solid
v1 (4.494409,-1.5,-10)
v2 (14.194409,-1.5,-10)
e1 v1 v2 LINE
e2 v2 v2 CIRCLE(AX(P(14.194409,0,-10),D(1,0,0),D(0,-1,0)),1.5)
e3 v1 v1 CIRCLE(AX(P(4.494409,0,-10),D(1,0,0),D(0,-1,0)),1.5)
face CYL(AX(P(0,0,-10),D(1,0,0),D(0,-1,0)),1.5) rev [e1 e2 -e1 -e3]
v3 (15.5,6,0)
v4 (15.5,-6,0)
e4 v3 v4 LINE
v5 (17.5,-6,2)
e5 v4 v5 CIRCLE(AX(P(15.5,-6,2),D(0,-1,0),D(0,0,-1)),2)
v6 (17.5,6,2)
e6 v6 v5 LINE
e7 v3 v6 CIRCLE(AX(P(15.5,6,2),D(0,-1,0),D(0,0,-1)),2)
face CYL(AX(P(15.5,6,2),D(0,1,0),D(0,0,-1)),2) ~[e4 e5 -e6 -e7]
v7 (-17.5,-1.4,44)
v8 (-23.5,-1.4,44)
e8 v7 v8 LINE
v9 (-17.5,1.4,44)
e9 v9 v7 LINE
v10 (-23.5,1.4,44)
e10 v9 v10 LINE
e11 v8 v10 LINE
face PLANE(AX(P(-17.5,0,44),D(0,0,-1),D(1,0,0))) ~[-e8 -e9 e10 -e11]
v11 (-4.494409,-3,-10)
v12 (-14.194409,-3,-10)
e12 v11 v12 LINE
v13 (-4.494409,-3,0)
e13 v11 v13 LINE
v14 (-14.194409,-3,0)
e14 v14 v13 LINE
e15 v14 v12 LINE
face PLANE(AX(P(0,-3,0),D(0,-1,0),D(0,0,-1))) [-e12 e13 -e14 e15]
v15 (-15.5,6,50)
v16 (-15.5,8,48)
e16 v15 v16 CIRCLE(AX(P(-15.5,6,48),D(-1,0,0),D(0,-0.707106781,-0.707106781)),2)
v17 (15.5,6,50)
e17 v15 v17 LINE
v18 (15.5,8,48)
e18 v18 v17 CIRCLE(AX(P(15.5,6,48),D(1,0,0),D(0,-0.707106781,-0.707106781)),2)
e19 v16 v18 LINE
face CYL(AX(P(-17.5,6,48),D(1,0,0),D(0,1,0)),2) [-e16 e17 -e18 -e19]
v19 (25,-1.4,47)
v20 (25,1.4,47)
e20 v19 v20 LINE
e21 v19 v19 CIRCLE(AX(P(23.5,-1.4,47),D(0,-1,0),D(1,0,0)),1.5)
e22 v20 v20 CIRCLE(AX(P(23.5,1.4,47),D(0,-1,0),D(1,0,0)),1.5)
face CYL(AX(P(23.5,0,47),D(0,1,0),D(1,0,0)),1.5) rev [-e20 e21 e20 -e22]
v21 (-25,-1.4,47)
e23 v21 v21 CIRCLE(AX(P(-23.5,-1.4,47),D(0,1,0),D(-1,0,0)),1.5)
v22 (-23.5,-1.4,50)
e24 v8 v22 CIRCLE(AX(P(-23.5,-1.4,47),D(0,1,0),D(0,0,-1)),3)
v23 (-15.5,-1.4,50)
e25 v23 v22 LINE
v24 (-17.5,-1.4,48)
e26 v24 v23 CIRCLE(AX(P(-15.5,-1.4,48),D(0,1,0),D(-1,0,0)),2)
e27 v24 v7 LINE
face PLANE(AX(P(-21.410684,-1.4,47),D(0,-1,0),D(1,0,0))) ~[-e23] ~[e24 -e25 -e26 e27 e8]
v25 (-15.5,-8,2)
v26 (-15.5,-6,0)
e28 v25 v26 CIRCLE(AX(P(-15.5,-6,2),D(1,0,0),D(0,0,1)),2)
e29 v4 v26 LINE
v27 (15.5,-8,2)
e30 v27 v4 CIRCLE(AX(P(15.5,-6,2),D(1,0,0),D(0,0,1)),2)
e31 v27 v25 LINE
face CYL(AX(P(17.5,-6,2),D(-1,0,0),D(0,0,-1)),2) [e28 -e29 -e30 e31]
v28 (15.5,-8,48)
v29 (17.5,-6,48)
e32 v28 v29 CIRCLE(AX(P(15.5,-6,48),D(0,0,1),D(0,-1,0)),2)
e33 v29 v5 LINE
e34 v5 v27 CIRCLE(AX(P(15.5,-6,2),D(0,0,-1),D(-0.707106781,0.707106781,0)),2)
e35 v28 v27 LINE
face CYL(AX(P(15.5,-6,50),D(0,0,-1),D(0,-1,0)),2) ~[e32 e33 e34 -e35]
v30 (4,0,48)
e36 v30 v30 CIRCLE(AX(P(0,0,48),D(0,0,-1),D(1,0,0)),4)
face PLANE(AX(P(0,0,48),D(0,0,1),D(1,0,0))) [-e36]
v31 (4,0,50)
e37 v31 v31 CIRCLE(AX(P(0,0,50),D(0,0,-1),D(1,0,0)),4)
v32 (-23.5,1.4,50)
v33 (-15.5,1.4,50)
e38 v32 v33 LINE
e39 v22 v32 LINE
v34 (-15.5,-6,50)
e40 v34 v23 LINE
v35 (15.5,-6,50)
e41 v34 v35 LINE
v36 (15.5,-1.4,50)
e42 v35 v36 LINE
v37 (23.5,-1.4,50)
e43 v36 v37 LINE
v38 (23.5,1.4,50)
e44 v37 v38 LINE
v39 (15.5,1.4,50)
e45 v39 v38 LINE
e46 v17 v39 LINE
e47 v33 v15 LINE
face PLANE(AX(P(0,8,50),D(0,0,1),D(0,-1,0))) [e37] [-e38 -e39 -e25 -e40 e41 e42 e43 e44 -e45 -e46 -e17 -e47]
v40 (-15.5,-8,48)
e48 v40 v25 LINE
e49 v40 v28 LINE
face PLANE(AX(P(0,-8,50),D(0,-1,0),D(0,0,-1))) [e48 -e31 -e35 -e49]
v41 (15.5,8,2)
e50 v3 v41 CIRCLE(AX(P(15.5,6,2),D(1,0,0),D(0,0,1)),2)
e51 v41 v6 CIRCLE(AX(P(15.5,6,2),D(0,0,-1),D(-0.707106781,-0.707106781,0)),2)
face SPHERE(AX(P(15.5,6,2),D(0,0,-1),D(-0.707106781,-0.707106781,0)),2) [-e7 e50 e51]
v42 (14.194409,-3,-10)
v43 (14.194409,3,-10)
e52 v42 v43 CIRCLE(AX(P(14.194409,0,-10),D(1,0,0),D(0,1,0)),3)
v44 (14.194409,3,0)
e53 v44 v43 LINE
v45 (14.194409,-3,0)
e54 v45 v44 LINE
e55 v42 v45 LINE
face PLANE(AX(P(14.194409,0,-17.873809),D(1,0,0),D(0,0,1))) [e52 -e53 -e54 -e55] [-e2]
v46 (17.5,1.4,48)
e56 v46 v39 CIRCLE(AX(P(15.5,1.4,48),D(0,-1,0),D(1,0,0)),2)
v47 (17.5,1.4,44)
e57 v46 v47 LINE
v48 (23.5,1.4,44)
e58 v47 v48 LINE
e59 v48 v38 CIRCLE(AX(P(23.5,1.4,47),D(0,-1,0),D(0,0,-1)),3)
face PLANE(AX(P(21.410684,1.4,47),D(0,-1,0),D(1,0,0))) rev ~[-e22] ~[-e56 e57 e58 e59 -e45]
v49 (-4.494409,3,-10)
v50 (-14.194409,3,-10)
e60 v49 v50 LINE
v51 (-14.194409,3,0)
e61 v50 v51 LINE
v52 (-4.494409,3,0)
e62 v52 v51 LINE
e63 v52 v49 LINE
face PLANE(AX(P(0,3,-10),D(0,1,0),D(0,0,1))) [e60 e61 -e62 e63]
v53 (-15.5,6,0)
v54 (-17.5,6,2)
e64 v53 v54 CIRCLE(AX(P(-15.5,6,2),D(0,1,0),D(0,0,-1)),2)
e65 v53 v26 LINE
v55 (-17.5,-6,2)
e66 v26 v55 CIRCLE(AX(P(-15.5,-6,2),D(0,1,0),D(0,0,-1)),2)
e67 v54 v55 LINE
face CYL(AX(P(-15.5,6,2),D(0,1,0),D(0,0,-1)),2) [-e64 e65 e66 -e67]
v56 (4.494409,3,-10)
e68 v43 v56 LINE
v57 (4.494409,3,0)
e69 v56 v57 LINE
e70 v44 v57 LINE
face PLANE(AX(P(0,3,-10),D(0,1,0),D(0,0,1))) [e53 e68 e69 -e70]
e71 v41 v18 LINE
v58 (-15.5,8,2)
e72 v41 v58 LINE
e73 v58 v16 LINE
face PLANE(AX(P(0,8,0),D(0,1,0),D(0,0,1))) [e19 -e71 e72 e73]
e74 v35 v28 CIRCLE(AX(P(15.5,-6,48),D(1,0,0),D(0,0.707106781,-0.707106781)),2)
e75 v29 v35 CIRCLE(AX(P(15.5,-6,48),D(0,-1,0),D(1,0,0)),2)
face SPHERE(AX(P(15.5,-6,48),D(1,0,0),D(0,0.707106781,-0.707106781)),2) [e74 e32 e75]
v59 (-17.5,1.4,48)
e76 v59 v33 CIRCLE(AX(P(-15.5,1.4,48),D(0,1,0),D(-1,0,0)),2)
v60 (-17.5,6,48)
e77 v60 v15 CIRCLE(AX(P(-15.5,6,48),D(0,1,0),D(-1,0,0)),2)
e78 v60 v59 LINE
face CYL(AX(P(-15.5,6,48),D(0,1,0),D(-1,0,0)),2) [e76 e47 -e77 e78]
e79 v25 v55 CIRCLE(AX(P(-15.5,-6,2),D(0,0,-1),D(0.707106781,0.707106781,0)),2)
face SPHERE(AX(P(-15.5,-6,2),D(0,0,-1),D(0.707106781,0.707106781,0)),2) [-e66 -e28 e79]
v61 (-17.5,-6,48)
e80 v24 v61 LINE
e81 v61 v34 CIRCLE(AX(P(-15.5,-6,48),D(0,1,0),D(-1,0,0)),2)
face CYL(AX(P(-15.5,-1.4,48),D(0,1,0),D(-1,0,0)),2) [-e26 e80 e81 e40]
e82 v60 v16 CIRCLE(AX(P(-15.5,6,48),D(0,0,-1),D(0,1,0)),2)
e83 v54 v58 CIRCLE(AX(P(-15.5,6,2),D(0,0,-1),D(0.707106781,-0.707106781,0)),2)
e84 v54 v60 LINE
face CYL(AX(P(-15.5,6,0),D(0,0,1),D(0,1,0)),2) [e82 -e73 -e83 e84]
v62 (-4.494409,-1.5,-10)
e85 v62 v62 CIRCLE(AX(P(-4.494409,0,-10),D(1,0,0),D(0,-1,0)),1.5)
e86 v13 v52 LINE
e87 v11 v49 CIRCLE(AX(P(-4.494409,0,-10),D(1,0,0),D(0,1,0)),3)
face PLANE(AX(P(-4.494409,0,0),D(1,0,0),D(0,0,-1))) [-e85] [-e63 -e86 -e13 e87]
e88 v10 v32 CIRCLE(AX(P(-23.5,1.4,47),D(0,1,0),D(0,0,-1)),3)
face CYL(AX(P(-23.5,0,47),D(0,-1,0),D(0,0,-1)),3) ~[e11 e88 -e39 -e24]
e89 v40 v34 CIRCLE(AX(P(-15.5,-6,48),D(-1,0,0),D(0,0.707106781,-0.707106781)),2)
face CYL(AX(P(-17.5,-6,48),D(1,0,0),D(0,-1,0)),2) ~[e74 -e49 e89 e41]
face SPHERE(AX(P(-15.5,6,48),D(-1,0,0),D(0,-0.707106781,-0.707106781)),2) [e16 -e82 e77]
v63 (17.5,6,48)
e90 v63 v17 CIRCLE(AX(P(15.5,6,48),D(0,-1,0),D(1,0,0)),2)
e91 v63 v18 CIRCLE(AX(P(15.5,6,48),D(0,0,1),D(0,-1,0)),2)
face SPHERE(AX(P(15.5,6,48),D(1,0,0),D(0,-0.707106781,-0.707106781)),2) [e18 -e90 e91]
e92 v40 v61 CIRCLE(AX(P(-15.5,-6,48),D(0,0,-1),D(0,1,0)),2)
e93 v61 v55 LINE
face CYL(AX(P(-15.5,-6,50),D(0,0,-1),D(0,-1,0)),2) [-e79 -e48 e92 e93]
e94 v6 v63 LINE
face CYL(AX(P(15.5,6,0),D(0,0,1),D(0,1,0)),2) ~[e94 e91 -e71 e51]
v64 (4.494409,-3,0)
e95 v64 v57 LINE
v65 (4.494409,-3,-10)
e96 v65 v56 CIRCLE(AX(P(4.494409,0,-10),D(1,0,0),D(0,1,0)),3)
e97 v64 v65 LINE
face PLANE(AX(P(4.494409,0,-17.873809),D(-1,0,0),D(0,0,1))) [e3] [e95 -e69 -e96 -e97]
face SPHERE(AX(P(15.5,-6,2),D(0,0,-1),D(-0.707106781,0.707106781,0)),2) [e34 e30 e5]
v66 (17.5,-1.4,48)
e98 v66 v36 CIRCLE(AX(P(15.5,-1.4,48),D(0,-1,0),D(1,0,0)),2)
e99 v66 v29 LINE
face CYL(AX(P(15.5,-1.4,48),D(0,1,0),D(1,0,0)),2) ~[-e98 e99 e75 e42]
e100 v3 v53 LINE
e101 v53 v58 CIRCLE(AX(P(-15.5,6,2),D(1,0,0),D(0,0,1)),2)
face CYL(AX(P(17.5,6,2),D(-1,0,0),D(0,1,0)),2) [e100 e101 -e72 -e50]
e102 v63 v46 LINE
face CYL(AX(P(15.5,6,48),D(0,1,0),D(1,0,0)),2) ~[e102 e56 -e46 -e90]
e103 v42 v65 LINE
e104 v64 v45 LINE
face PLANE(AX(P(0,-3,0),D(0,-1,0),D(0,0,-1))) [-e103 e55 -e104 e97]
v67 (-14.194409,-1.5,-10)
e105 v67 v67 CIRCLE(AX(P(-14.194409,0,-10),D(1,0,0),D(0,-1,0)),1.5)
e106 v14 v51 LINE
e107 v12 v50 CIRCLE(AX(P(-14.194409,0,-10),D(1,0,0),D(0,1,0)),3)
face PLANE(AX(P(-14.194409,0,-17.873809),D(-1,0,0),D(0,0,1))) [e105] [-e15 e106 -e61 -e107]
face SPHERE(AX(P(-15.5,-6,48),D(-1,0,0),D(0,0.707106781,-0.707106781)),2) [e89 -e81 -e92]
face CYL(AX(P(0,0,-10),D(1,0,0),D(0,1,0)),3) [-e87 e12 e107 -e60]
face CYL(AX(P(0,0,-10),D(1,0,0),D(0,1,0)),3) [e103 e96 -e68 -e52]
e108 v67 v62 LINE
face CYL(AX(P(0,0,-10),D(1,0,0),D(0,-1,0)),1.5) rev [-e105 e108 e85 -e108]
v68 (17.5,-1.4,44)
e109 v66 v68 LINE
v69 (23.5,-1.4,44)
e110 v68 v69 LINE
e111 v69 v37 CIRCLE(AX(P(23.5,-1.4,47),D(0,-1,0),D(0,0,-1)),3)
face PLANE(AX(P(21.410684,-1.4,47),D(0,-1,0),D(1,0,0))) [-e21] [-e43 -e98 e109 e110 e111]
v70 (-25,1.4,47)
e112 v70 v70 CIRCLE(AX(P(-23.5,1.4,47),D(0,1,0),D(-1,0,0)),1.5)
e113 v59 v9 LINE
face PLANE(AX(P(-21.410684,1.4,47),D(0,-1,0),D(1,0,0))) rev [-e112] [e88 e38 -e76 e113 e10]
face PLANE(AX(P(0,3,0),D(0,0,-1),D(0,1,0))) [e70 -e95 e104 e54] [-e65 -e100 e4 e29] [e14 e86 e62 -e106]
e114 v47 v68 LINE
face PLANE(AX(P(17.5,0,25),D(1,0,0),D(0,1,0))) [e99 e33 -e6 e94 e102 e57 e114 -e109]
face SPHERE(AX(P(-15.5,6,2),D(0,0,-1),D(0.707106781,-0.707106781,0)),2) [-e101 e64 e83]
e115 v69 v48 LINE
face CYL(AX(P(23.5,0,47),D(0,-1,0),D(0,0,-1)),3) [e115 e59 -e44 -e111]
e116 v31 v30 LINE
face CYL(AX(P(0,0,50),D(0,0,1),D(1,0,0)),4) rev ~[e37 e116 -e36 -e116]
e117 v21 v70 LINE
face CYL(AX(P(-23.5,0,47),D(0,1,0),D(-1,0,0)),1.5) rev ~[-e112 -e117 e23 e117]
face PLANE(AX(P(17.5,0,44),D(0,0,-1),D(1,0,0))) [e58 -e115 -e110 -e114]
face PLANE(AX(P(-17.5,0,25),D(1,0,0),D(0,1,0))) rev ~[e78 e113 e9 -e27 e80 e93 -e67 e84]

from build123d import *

# Parameters (mm, degrees)
F1_DEPTH      = 17.5
F2_W          = 6.3770967536
F2_H          = 17.8738087416
F2_W_2        = 4.4888177946
F3_DEPTH      = 12.5
F5_R          = 4
F6_DEPTH      = 2
F7_R          = 1.5
F8_DEPTH      = 1.4
F10_R         = 2
F11_T1_DEPTH  = 12
F11_T3_DEPTH  = 4.6
F11_T5_DEPTH  = 4.6
F11_S9_W      = 2
F11_S9_H      = 2
F11_T10_DEPTH = 2
F11_S15_W     = 2
F11_S15_H     = 2
F11_T16_DEPTH = 2
F11_S21_W     = 2
F11_S21_H     = 2
F11_T22_DEPTH = 2
F11_S27_W     = 2
F11_S27_H     = 2
F11_T28_DEPTH = 2
F11_S33_W     = 2
F11_S33_H     = 2
F11_T34_DEPTH = 2
F11_S39_W     = 2
F11_S39_H     = 2
F11_T40_DEPTH = 2
F11_S45_W     = 2
F11_S45_H     = 2
F11_T46_DEPTH = 2
F11_S51_W     = 2
F11_S51_H     = 2
F11_T52_DEPTH = 2
F11_T58_DEPTH = 9.6
F11_T63_DEPTH = 9.6
F11_T68_DEPTH = 9.6
F11_T73_DEPTH = 9.6


# Not quite as in the source:
# - a fillet or chamfer that OpenCascade refuses, or shapes differently, is made with other operations: its cross-section is extruded or revolved along the edge and cut away or added


with BuildPart() as f1:
    # F0 (on Right) → F1 (new body, symmetric)
    with BuildSketch(Plane.YZ):
        Polygon((3, 0), (8, 0), (8, 50), (-8, 50), (-8, 0), (-3, 0), align=None)
        with BuildLine():
            Line((3, -10), (3, 0))
            Line((3, 0), (-3, 0))
            Line((-3, 0), (-3, -10))
            ThreePointArc((-3, -10), (0, -7), (3, -10))
        make_face()
        with BuildLine():
            ThreePointArc((-3, -10), (0, -13), (3, -10))
            ThreePointArc((3, -10), (0, -7), (-3, -10))
        make_face()
        with BuildLine():
            ThreePointArc((1.5, -10), (0, -11.5), (-1.5, -10))
            ThreePointArc((-1.5, -10), (0, -8.5), (1.5, -10))
        make_face(mode=Mode.SUBTRACT)
    extrude(amount=F1_DEPTH, both=True)

    # F2 (on Front) → F3 (cut, symmetric)
    with BuildSketch(Plane.XZ):
        with Locations((-17.3829572741, -8.9369043708)):
            Rectangle(F2_W, F2_H)
        Polygon((-0.0055911027, 0), (-4.4944088973, 0), (-4.4944088973, -17.8738087416), (-0.0055911027, -17.8738087416), (0.0055911027, -17.8738087416), (0.0055911027, 0), align=None)
        with Locations((2.25, -8.9369043708)):
            Rectangle(F2_W_2, F2_H)
        with Locations((17.3829572741, -8.9369043708)):
            Rectangle(F2_W, F2_H)
    extrude(amount=F3_DEPTH, both=True, mode=Mode.SUBTRACT)

    # F5 (on offset) → F6 (cut)
    with BuildSketch(Plane.XY.offset(50)):
        Circle(F5_R)
    extrude(amount=-F6_DEPTH, mode=Mode.SUBTRACT)

    # F7 (on Front) → F8 (join, symmetric)
    with BuildSketch(Plane.XZ):
        with BuildLine():
            Line((23.5, 50), (17.5, 50))
            Line((17.5, 50), (17.5, 44))
            Line((17.5, 44), (23.5, 44))
            ThreePointArc((23.5, 44), (26.5, 47), (23.5, 50))
        make_face()
        with Locations((23.5, 47)):
            Circle(F7_R, mode=Mode.SUBTRACT)
    extrude(amount=F8_DEPTH, both=True)

    # F9: F1 across plane


with BuildPart() as f1_1:
    add(f1.part)
    add(f1.part.mirror(Plane.YZ))

    # F10
    f10_edges = [f1_1.edges().sort_by_distance(p)[0] for p in [
        (0, -8, 50),
        (-17.5, -8, 25),
        (0, -8, 0),
        (17.5, -8, 25),
        (0, 8, 0),
        (-17.5, 8, 25),
        (0, 8, 50),
        (17.5, 8, 25),
    ]]
    fillet(f10_edges, radius=F10_R)

    # F11: fillet of radius 2 on 8 edges, made by hand

    # F11_s2 → F11_t1 (cut)
    with BuildSketch(Plane.XZ.offset(-6)):
        with BuildLine():
            ThreePointArc((15.5, 0), (16.9142135624, 0.5857864376), (17.5, 2))
            Line((17.5, 2), (17.5, 0))
            Line((17.5, 0), (15.5, 0))
        make_face()
        with BuildLine():
            ThreePointArc((-15.5, 0), (-16.9142135624, 0.5857864376), (-17.5, 2))
            Line((-17.5, 2), (-17.5, 0))
            Line((-17.5, 0), (-15.5, 0))
        make_face()
    extrude(amount=F11_T1_DEPTH, mode=Mode.SUBTRACT)

    # F11_s4 → F11_t3 (cut)
    with BuildSketch(Plane.XZ.offset(-6)):
        with BuildLine():
            ThreePointArc((17.5, 48), (16.9142135624, 49.4142135624), (15.5, 50))
            Line((15.5, 50), (17.5, 50))
            Line((17.5, 50), (17.5, 48))
        make_face()
        with BuildLine():
            ThreePointArc((-17.5, 48), (-16.9142135624, 49.4142135624), (-15.5, 50))
            Line((-15.5, 50), (-17.5, 50))
            Line((-17.5, 50), (-17.5, 48))
        make_face()
    extrude(amount=F11_T3_DEPTH, mode=Mode.SUBTRACT)

    # F11_s6 → F11_t5 (cut)
    with BuildSketch(Plane.XZ.offset(1.4)):
        with BuildLine():
            ThreePointArc((17.5, 48), (16.9142135624, 49.4142135624), (15.5, 50))
            Line((15.5, 50), (17.5, 50))
            Line((17.5, 50), (17.5, 48))
        make_face()
        with BuildLine():
            ThreePointArc((-17.5, 48), (-16.9142135624, 49.4142135624), (-15.5, 50))
            Line((-15.5, 50), (-17.5, 50))
            Line((-17.5, 50), (-17.5, 48))
        make_face()
    extrude(amount=F11_T5_DEPTH, mode=Mode.SUBTRACT)


with BuildPart() as f11_tool8:
    # F11_s9 → F11_t10 (new body)
    with BuildSketch(Plane.YZ.offset(-15.5)):
        with Locations((7, 49)):
            Rectangle(F11_S9_W, F11_S9_H)
    extrude(amount=-F11_T10_DEPTH)

    # F11_s11 → F11_t12 (revolve, cut)
    with BuildSketch(Plane(origin=(-15.5, 6, 48), x_dir=(0, -0.7071067812, -0.7071067812), z_dir=(0, 0.7071067812, -0.7071067812))):
        with BuildLine():
            ThreePointArc((0, -2), (2, 0), (0, 2))
            Line((0, 2), (0, -2))
        make_face()
    revolve(axis=Axis((-15.5, 6, 48), (-1, 0, 0)), mode=Mode.SUBTRACT)


with BuildPart() as f1_2:
    add(f1_1.part)

    # F11_t7: cut F11_tool8
    add(f11_tool8.part, mode=Mode.SUBTRACT)


with BuildPart() as f11_tool14:
    # F11_s15 → F11_t16 (new body)
    with BuildSketch(Plane.YZ.offset(-15.5)):
        with Locations((-7, 49)):
            Rectangle(F11_S15_W, F11_S15_H)
    extrude(amount=-F11_T16_DEPTH)

    # F11_s17 → F11_t18 (revolve, cut)
    with BuildSketch(Plane(origin=(-15.5, -6, 48), x_dir=(0, 0.7071067812, -0.7071067812), z_dir=(0, 0.7071067812, 0.7071067812))):
        with BuildLine():
            ThreePointArc((0, -2), (2, 0), (0, 2))
            Line((0, 2), (0, -2))
        make_face()
    revolve(axis=Axis((-15.5, -6, 48), (-1, 0, 0)), mode=Mode.SUBTRACT)


with BuildPart() as f1_3:
    add(f1_2.part)

    # F11_t13: cut F11_tool14
    add(f11_tool14.part, mode=Mode.SUBTRACT)


with BuildPart() as f11_tool20:
    # F11_s21 → F11_t22 (new body)
    with BuildSketch(Plane.YZ.offset(15.5)):
        with Locations((-7, 49)):
            Rectangle(F11_S21_W, F11_S21_H)
    extrude(amount=F11_T22_DEPTH)

    # F11_s23 → F11_t24 (revolve, cut)
    with BuildSketch(Plane(origin=(15.5, -6, 48), x_dir=(0, 0.7071067812, -0.7071067812), z_dir=(0, -0.7071067812, -0.7071067812))):
        with BuildLine():
            ThreePointArc((0, -2), (2, 0), (0, 2))
            Line((0, 2), (0, -2))
        make_face()
    revolve(axis=Axis((15.5, -6, 48), (1, 0, 0)), mode=Mode.SUBTRACT)


with BuildPart() as f1_4:
    add(f1_3.part)

    # F11_t19: cut F11_tool20
    add(f11_tool20.part, mode=Mode.SUBTRACT)


with BuildPart() as f11_tool26:
    # F11_s27 → F11_t28 (new body)
    with BuildSketch(Plane.YZ.offset(15.5)):
        with Locations((7, 49)):
            Rectangle(F11_S27_W, F11_S27_H)
    extrude(amount=F11_T28_DEPTH)

    # F11_s29 → F11_t30 (revolve, cut)
    with BuildSketch(Plane(origin=(15.5, 6, 48), x_dir=(0, -0.7071067812, -0.7071067812), z_dir=(0, -0.7071067812, 0.7071067812))):
        with BuildLine():
            ThreePointArc((0, -2), (2, 0), (0, 2))
            Line((0, 2), (0, -2))
        make_face()
    revolve(axis=Axis((15.5, 6, 48), (1, 0, 0)), mode=Mode.SUBTRACT)


with BuildPart() as f1_5:
    add(f1_4.part)

    # F11_t25: cut F11_tool26
    add(f11_tool26.part, mode=Mode.SUBTRACT)


with BuildPart() as f11_tool32:
    # F11_s33 → F11_t34 (new body)
    with BuildSketch(Plane.XY.offset(2)):
        with Locations((-16.5, -7)):
            Rectangle(F11_S33_W, F11_S33_H)
    extrude(amount=-F11_T34_DEPTH)

    # F11_s35 → F11_t36 (revolve, cut)
    with BuildSketch(Plane(origin=(-15.5, -6, 2), x_dir=(0.7071067812, 0.7071067812, 0), z_dir=(-0.7071067812, 0.7071067812, 0))):
        with BuildLine():
            ThreePointArc((0, -2), (2, 0), (0, 2))
            Line((0, 2), (0, -2))
        make_face()
    revolve(axis=Axis((-15.5, -6, 2), (0, 0, -1)), mode=Mode.SUBTRACT)


with BuildPart() as f1_6:
    add(f1_5.part)

    # F11_t31: cut F11_tool32
    add(f11_tool32.part, mode=Mode.SUBTRACT)


with BuildPart() as f11_tool38:
    # F11_s39 → F11_t40 (new body)
    with BuildSketch(Plane.XY.offset(2)):
        with Locations((-16.5, 7)):
            Rectangle(F11_S39_W, F11_S39_H)
    extrude(amount=-F11_T40_DEPTH)

    # F11_s41 → F11_t42 (revolve, cut)
    with BuildSketch(Plane(origin=(-15.5, 6, 2), x_dir=(0.7071067812, -0.7071067812, 0), z_dir=(0.7071067812, 0.7071067812, 0))):
        with BuildLine():
            ThreePointArc((0, -2), (2, 0), (0, 2))
            Line((0, 2), (0, -2))
        make_face()
    revolve(axis=Axis((-15.5, 6, 2), (0, 0, -1)), mode=Mode.SUBTRACT)


with BuildPart() as f1_7:
    add(f1_6.part)

    # F11_t37: cut F11_tool38
    add(f11_tool38.part, mode=Mode.SUBTRACT)


with BuildPart() as f11_tool44:
    # F11_s45 → F11_t46 (new body)
    with BuildSketch(Plane.XY.offset(2)):
        with Locations((16.5, 7)):
            Rectangle(F11_S45_W, F11_S45_H)
    extrude(amount=-F11_T46_DEPTH)

    # F11_s47 → F11_t48 (revolve, cut)
    with BuildSketch(Plane(origin=(15.5, 6, 2), x_dir=(-0.7071067812, -0.7071067812, 0), z_dir=(0.7071067812, -0.7071067812, 0))):
        with BuildLine():
            ThreePointArc((0, -2), (2, 0), (0, 2))
            Line((0, 2), (0, -2))
        make_face()
    revolve(axis=Axis((15.5, 6, 2), (0, 0, -1)), mode=Mode.SUBTRACT)


with BuildPart() as f1_8:
    add(f1_7.part)

    # F11_t43: cut F11_tool44
    add(f11_tool44.part, mode=Mode.SUBTRACT)


with BuildPart() as f11_tool50:
    # F11_s51 → F11_t52 (new body)
    with BuildSketch(Plane.XY.offset(2)):
        with Locations((16.5, -7)):
            Rectangle(F11_S51_W, F11_S51_H)
    extrude(amount=-F11_T52_DEPTH)

    # F11_s53 → F11_t54 (revolve, cut)
    with BuildSketch(Plane(origin=(15.5, -6, 2), x_dir=(-0.7071067812, 0.7071067812, 0), z_dir=(-0.7071067812, -0.7071067812, 0))):
        with BuildLine():
            ThreePointArc((0, -2), (2, 0), (0, 2))
            Line((0, 2), (0, -2))
        make_face()
    revolve(axis=Axis((15.5, -6, 2), (0, 0, -1)), mode=Mode.SUBTRACT)


with BuildPart() as f1_9:
    add(f1_8.part)

    # F11_t49: cut F11_tool50
    add(f11_tool50.part, mode=Mode.SUBTRACT)


with BuildPart() as f11_tool56:
    # F11_s57 → F11_t58 (new body)
    with BuildSketch(Plane.XZ.offset(-6)):
        with BuildLine():
            ThreePointArc((17.5, 48), (16.9142135624, 49.4142135624), (15.5, 50))
            Line((15.5, 50), (17.5, 50))
            Line((17.5, 50), (17.5, 48))
        make_face()
    extrude(amount=F11_T58_DEPTH)

    split(bisect_by=Plane.XZ.offset(1.4), keep=Keep.TOP)


with BuildPart() as f1_10:
    add(f1_9.part)

    # F11_t55: cut F11_tool56
    add(f11_tool56.part, mode=Mode.SUBTRACT)


with BuildPart() as f11_tool61:
    # F11_s62 → F11_t63 (new body)
    with BuildSketch(Plane.XZ.offset(-3.6)):
        with BuildLine():
            ThreePointArc((17.5, 48), (16.9142135624, 49.4142135624), (15.5, 50))
            Line((15.5, 50), (17.5, 50))
            Line((17.5, 50), (17.5, 48))
        make_face()
    extrude(amount=F11_T63_DEPTH)

    split(bisect_by=Plane.XZ.offset(-1.4), keep=Keep.BOTTOM)


with BuildPart() as f1_11:
    add(f1_10.part)

    # F11_t60: cut F11_tool61
    add(f11_tool61.part, mode=Mode.SUBTRACT)


with BuildPart() as f11_tool66:
    # F11_s67 → F11_t68 (new body)
    with BuildSketch(Plane.XZ.offset(-3.6)):
        with BuildLine():
            ThreePointArc((-17.5, 48), (-16.9142135624, 49.4142135624), (-15.5, 50))
            Line((-15.5, 50), (-17.5, 50))
            Line((-17.5, 50), (-17.5, 48))
        make_face()
    extrude(amount=F11_T68_DEPTH)

    split(bisect_by=Plane.XZ.offset(-1.4), keep=Keep.BOTTOM)


with BuildPart() as f1_12:
    add(f1_11.part)

    # F11_t65: cut F11_tool66
    add(f11_tool66.part, mode=Mode.SUBTRACT)


with BuildPart() as f11_tool71:
    # F11_s72 → F11_t73 (new body)
    with BuildSketch(Plane.XZ.offset(-6)):
        with BuildLine():
            ThreePointArc((-17.5, 48), (-16.9142135624, 49.4142135624), (-15.5, 50))
            Line((-15.5, 50), (-17.5, 50))
            Line((-17.5, 50), (-17.5, 48))
        make_face()
    extrude(amount=F11_T73_DEPTH)

    split(bisect_by=Plane.XZ.offset(1.4), keep=Keep.TOP)


with BuildPart() as f1_13:
    add(f1_12.part)

    # F11_t70: cut F11_tool71
    add(f11_tool71.part, mode=Mode.SUBTRACT)


solid = f1_13.part
